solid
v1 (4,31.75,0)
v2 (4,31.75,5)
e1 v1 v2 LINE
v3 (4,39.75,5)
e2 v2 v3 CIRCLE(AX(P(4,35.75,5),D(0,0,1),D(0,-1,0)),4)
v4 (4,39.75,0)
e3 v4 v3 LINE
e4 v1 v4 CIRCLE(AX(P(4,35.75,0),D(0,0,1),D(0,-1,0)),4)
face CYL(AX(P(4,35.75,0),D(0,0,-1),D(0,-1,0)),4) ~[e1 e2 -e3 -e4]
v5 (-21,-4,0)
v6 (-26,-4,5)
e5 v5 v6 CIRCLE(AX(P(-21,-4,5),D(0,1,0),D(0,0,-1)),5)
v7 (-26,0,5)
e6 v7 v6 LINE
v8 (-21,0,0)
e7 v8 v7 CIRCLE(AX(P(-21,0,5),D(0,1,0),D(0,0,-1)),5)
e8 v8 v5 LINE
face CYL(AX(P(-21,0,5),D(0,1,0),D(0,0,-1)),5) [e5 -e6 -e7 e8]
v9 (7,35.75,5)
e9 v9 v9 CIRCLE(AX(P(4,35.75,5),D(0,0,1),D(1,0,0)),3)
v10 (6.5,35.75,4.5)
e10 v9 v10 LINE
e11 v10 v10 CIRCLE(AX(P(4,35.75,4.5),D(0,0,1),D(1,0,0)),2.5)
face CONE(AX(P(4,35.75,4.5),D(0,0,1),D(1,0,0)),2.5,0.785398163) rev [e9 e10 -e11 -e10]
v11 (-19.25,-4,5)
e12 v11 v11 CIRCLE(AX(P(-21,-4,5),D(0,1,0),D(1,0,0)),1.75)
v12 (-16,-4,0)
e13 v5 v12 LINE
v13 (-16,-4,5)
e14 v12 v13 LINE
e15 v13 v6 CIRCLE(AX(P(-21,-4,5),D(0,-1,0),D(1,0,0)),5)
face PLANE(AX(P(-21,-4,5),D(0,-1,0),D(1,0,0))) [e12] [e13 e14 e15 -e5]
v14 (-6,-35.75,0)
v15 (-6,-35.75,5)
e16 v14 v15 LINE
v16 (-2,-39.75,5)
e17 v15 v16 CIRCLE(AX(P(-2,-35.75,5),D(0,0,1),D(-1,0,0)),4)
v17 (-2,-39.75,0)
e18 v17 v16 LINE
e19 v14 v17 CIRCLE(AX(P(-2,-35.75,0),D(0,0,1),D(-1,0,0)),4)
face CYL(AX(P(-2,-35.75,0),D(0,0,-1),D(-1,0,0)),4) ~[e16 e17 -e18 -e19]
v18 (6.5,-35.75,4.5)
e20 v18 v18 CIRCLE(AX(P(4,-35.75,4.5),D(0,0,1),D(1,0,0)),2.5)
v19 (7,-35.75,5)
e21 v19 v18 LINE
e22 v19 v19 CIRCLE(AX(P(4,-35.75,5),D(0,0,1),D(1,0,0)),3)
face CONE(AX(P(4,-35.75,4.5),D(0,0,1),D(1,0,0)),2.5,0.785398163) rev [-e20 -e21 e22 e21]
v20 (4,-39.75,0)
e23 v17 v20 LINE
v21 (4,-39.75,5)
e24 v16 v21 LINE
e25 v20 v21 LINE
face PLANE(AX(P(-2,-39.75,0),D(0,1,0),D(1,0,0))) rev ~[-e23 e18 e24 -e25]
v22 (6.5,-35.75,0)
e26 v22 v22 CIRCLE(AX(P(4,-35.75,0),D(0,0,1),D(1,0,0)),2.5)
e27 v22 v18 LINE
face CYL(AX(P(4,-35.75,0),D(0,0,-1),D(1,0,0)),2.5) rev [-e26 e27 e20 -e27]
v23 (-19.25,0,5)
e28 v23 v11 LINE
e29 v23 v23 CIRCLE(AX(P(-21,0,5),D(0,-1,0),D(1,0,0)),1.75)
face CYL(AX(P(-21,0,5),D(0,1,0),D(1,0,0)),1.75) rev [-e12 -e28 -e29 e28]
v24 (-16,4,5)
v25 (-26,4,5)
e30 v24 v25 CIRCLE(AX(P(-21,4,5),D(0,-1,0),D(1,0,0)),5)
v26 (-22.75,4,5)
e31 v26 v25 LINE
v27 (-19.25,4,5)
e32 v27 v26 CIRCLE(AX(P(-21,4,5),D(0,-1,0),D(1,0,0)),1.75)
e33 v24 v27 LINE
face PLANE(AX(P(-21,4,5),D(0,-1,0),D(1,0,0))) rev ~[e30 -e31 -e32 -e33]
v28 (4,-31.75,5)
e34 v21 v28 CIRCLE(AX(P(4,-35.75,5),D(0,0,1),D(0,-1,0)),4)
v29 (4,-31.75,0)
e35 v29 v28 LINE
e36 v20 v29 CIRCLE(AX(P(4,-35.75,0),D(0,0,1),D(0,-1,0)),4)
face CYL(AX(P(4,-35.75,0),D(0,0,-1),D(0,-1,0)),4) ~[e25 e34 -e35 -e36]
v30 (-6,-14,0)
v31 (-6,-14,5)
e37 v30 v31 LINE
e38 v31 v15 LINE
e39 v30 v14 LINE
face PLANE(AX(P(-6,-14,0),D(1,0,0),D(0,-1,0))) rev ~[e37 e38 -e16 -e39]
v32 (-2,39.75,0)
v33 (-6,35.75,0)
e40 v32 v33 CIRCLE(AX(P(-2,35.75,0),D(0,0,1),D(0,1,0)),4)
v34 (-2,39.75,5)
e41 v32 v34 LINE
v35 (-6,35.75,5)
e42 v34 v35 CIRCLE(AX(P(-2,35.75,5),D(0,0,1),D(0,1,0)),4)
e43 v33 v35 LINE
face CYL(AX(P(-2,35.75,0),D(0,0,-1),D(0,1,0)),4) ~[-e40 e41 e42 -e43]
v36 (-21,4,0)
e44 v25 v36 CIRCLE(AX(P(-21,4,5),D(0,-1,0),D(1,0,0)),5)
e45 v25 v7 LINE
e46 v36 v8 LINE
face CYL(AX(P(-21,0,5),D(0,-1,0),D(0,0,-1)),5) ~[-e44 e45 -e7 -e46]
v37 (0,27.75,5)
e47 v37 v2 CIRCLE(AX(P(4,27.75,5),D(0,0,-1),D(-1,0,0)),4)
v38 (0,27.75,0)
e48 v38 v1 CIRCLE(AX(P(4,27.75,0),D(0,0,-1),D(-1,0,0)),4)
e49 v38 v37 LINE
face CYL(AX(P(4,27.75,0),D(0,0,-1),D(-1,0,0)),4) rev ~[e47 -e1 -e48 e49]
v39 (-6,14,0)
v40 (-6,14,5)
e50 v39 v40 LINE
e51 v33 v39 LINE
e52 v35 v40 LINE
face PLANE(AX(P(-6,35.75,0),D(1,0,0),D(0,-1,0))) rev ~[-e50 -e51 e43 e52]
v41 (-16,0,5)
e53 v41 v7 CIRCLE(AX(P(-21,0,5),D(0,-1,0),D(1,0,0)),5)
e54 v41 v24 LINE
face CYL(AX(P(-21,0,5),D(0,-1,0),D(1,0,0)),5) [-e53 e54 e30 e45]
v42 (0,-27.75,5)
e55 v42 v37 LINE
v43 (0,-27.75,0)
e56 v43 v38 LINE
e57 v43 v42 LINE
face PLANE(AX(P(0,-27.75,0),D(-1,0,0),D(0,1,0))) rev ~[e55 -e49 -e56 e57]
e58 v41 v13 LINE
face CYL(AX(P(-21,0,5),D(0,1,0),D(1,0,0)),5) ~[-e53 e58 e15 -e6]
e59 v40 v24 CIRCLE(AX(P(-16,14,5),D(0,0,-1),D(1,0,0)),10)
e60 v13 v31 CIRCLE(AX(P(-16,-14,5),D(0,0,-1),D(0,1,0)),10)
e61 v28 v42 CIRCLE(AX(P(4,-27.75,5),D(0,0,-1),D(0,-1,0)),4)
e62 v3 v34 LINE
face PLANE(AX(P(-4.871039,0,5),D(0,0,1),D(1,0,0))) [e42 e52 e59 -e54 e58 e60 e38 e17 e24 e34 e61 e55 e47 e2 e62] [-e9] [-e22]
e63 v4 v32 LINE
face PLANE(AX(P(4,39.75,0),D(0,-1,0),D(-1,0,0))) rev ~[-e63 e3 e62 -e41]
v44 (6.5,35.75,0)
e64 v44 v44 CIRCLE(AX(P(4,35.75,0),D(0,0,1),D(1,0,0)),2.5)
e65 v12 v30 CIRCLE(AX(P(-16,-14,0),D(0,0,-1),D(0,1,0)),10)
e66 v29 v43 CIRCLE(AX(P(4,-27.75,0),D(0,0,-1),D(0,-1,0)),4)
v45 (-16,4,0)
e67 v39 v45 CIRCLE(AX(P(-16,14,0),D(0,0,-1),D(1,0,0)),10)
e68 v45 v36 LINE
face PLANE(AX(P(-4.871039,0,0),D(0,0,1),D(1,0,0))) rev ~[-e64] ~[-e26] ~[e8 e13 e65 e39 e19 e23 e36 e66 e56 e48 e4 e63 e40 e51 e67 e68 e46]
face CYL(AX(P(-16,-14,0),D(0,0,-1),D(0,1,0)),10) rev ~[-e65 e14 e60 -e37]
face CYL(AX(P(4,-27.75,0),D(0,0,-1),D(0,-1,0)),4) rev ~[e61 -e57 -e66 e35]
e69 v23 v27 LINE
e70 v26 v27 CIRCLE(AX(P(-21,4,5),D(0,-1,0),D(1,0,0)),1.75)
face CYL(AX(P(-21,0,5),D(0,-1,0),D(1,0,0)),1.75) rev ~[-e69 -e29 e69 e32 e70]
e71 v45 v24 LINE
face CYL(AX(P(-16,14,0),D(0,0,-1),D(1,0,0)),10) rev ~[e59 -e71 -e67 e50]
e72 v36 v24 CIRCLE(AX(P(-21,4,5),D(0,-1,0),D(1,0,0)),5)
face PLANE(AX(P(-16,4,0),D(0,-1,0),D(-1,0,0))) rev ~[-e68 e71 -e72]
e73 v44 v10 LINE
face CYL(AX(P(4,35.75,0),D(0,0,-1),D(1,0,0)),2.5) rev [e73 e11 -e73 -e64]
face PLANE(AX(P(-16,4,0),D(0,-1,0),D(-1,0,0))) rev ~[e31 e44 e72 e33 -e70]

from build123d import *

# Parameters (mm, degrees)
F0_R          = 2.5
F1_DEPTH      = 5
F2_R          = 5
F3_DEPTH      = 4
F3_DEPTH_BACK = 4
F4_R          = 1.75
F5_DEPTH      = 39.751
F5_DEPTH_BACK = 39.751
F6_SIZE       = 0.5


# Not quite as in the source:
# - after a boolean that leaves OpenCascade's solid faulty, fix() repairs it


with BuildPart() as f1:
    # F0 (on Top) → F1 (new body)
    with BuildSketch(Plane.XY):
        with BuildLine():
            Line((-16, 4), (-26, 4))
            Line((-26, 4), (-26, 0))
            Line((-26, 0), (-26, -4))
            Line((-26, -4), (-16, -4))
            ThreePointArc((-16, -4), (-8.9289321881, -6.9289321881), (-6, -14))
            Line((-6, -14), (-6, -35.75))
            ThreePointArc((-6, -35.75), (-4.8284271247, -38.5784271247), (-2, -39.75))
            Line((-2, -39.75), (4, -39.75))
            ThreePointArc((4, -39.75), (8, -35.75), (4, -31.75))
            ThreePointArc((4, -31.75), (1.1715728753, -30.5784271247), (0, -27.75))
            Line((0, -27.75), (0, 0))
            Line((0, 0), (0, 27.75))
            ThreePointArc((0, 27.75), (1.1715728753, 30.5784271247), (4, 31.75))
            ThreePointArc((4, 31.75), (8, 35.75), (4, 39.75))
            Line((4, 39.75), (-2, 39.75))
            ThreePointArc((-2, 39.75), (-4.8284271247, 38.5784271247), (-6, 35.75))
            Line((-6, 35.75), (-6, 14))
            ThreePointArc((-6, 14), (-8.9289321881, 6.9289321881), (-16, 4))
        make_face()
        with Locations((4, -35.75)):
            Circle(F0_R, mode=Mode.SUBTRACT)
        with Locations((4, 35.75)):
            Circle(F0_R, mode=Mode.SUBTRACT)
    extrude(amount=F1_DEPTH)

    # F2 (on Front) → F3 (join, two sides)
    with BuildSketch(Plane.XZ) as f3_sk:
        with Locations((-21, 5)):
            Circle(F2_R)
    extrude(amount=F3_DEPTH)
    extrude(f3_sk.sketch, amount=-F3_DEPTH_BACK)

    # F4 (on Front) → F5 (cut, two sides)
    with BuildSketch(Plane.XZ) as f5_sk:
        with BuildLine():
            ThreePointArc((-21, 0), (-24.5355339059, 1.4644660941), (-26, 5))
            Line((-26, 5), (-26, 0))
            Line((-26, 0), (-21, 0))
        make_face()
        with Locations((-21, 5)):
            Circle(F4_R)
    extrude(amount=-F5_DEPTH, mode=Mode.SUBTRACT)
    extrude(f5_sk.sketch, amount=F5_DEPTH_BACK, mode=Mode.SUBTRACT)

    add(f1.part.fix(), mode=Mode.REPLACE)

    # F6
    f6_edges = [f1.edges().sort_by_distance(p)[0] for p in [
        (1.5, 35.75, 5),
        (1.5, -35.75, 5),
    ]]
    chamfer(f6_edges, length=F6_SIZE)


solid = f1.part
